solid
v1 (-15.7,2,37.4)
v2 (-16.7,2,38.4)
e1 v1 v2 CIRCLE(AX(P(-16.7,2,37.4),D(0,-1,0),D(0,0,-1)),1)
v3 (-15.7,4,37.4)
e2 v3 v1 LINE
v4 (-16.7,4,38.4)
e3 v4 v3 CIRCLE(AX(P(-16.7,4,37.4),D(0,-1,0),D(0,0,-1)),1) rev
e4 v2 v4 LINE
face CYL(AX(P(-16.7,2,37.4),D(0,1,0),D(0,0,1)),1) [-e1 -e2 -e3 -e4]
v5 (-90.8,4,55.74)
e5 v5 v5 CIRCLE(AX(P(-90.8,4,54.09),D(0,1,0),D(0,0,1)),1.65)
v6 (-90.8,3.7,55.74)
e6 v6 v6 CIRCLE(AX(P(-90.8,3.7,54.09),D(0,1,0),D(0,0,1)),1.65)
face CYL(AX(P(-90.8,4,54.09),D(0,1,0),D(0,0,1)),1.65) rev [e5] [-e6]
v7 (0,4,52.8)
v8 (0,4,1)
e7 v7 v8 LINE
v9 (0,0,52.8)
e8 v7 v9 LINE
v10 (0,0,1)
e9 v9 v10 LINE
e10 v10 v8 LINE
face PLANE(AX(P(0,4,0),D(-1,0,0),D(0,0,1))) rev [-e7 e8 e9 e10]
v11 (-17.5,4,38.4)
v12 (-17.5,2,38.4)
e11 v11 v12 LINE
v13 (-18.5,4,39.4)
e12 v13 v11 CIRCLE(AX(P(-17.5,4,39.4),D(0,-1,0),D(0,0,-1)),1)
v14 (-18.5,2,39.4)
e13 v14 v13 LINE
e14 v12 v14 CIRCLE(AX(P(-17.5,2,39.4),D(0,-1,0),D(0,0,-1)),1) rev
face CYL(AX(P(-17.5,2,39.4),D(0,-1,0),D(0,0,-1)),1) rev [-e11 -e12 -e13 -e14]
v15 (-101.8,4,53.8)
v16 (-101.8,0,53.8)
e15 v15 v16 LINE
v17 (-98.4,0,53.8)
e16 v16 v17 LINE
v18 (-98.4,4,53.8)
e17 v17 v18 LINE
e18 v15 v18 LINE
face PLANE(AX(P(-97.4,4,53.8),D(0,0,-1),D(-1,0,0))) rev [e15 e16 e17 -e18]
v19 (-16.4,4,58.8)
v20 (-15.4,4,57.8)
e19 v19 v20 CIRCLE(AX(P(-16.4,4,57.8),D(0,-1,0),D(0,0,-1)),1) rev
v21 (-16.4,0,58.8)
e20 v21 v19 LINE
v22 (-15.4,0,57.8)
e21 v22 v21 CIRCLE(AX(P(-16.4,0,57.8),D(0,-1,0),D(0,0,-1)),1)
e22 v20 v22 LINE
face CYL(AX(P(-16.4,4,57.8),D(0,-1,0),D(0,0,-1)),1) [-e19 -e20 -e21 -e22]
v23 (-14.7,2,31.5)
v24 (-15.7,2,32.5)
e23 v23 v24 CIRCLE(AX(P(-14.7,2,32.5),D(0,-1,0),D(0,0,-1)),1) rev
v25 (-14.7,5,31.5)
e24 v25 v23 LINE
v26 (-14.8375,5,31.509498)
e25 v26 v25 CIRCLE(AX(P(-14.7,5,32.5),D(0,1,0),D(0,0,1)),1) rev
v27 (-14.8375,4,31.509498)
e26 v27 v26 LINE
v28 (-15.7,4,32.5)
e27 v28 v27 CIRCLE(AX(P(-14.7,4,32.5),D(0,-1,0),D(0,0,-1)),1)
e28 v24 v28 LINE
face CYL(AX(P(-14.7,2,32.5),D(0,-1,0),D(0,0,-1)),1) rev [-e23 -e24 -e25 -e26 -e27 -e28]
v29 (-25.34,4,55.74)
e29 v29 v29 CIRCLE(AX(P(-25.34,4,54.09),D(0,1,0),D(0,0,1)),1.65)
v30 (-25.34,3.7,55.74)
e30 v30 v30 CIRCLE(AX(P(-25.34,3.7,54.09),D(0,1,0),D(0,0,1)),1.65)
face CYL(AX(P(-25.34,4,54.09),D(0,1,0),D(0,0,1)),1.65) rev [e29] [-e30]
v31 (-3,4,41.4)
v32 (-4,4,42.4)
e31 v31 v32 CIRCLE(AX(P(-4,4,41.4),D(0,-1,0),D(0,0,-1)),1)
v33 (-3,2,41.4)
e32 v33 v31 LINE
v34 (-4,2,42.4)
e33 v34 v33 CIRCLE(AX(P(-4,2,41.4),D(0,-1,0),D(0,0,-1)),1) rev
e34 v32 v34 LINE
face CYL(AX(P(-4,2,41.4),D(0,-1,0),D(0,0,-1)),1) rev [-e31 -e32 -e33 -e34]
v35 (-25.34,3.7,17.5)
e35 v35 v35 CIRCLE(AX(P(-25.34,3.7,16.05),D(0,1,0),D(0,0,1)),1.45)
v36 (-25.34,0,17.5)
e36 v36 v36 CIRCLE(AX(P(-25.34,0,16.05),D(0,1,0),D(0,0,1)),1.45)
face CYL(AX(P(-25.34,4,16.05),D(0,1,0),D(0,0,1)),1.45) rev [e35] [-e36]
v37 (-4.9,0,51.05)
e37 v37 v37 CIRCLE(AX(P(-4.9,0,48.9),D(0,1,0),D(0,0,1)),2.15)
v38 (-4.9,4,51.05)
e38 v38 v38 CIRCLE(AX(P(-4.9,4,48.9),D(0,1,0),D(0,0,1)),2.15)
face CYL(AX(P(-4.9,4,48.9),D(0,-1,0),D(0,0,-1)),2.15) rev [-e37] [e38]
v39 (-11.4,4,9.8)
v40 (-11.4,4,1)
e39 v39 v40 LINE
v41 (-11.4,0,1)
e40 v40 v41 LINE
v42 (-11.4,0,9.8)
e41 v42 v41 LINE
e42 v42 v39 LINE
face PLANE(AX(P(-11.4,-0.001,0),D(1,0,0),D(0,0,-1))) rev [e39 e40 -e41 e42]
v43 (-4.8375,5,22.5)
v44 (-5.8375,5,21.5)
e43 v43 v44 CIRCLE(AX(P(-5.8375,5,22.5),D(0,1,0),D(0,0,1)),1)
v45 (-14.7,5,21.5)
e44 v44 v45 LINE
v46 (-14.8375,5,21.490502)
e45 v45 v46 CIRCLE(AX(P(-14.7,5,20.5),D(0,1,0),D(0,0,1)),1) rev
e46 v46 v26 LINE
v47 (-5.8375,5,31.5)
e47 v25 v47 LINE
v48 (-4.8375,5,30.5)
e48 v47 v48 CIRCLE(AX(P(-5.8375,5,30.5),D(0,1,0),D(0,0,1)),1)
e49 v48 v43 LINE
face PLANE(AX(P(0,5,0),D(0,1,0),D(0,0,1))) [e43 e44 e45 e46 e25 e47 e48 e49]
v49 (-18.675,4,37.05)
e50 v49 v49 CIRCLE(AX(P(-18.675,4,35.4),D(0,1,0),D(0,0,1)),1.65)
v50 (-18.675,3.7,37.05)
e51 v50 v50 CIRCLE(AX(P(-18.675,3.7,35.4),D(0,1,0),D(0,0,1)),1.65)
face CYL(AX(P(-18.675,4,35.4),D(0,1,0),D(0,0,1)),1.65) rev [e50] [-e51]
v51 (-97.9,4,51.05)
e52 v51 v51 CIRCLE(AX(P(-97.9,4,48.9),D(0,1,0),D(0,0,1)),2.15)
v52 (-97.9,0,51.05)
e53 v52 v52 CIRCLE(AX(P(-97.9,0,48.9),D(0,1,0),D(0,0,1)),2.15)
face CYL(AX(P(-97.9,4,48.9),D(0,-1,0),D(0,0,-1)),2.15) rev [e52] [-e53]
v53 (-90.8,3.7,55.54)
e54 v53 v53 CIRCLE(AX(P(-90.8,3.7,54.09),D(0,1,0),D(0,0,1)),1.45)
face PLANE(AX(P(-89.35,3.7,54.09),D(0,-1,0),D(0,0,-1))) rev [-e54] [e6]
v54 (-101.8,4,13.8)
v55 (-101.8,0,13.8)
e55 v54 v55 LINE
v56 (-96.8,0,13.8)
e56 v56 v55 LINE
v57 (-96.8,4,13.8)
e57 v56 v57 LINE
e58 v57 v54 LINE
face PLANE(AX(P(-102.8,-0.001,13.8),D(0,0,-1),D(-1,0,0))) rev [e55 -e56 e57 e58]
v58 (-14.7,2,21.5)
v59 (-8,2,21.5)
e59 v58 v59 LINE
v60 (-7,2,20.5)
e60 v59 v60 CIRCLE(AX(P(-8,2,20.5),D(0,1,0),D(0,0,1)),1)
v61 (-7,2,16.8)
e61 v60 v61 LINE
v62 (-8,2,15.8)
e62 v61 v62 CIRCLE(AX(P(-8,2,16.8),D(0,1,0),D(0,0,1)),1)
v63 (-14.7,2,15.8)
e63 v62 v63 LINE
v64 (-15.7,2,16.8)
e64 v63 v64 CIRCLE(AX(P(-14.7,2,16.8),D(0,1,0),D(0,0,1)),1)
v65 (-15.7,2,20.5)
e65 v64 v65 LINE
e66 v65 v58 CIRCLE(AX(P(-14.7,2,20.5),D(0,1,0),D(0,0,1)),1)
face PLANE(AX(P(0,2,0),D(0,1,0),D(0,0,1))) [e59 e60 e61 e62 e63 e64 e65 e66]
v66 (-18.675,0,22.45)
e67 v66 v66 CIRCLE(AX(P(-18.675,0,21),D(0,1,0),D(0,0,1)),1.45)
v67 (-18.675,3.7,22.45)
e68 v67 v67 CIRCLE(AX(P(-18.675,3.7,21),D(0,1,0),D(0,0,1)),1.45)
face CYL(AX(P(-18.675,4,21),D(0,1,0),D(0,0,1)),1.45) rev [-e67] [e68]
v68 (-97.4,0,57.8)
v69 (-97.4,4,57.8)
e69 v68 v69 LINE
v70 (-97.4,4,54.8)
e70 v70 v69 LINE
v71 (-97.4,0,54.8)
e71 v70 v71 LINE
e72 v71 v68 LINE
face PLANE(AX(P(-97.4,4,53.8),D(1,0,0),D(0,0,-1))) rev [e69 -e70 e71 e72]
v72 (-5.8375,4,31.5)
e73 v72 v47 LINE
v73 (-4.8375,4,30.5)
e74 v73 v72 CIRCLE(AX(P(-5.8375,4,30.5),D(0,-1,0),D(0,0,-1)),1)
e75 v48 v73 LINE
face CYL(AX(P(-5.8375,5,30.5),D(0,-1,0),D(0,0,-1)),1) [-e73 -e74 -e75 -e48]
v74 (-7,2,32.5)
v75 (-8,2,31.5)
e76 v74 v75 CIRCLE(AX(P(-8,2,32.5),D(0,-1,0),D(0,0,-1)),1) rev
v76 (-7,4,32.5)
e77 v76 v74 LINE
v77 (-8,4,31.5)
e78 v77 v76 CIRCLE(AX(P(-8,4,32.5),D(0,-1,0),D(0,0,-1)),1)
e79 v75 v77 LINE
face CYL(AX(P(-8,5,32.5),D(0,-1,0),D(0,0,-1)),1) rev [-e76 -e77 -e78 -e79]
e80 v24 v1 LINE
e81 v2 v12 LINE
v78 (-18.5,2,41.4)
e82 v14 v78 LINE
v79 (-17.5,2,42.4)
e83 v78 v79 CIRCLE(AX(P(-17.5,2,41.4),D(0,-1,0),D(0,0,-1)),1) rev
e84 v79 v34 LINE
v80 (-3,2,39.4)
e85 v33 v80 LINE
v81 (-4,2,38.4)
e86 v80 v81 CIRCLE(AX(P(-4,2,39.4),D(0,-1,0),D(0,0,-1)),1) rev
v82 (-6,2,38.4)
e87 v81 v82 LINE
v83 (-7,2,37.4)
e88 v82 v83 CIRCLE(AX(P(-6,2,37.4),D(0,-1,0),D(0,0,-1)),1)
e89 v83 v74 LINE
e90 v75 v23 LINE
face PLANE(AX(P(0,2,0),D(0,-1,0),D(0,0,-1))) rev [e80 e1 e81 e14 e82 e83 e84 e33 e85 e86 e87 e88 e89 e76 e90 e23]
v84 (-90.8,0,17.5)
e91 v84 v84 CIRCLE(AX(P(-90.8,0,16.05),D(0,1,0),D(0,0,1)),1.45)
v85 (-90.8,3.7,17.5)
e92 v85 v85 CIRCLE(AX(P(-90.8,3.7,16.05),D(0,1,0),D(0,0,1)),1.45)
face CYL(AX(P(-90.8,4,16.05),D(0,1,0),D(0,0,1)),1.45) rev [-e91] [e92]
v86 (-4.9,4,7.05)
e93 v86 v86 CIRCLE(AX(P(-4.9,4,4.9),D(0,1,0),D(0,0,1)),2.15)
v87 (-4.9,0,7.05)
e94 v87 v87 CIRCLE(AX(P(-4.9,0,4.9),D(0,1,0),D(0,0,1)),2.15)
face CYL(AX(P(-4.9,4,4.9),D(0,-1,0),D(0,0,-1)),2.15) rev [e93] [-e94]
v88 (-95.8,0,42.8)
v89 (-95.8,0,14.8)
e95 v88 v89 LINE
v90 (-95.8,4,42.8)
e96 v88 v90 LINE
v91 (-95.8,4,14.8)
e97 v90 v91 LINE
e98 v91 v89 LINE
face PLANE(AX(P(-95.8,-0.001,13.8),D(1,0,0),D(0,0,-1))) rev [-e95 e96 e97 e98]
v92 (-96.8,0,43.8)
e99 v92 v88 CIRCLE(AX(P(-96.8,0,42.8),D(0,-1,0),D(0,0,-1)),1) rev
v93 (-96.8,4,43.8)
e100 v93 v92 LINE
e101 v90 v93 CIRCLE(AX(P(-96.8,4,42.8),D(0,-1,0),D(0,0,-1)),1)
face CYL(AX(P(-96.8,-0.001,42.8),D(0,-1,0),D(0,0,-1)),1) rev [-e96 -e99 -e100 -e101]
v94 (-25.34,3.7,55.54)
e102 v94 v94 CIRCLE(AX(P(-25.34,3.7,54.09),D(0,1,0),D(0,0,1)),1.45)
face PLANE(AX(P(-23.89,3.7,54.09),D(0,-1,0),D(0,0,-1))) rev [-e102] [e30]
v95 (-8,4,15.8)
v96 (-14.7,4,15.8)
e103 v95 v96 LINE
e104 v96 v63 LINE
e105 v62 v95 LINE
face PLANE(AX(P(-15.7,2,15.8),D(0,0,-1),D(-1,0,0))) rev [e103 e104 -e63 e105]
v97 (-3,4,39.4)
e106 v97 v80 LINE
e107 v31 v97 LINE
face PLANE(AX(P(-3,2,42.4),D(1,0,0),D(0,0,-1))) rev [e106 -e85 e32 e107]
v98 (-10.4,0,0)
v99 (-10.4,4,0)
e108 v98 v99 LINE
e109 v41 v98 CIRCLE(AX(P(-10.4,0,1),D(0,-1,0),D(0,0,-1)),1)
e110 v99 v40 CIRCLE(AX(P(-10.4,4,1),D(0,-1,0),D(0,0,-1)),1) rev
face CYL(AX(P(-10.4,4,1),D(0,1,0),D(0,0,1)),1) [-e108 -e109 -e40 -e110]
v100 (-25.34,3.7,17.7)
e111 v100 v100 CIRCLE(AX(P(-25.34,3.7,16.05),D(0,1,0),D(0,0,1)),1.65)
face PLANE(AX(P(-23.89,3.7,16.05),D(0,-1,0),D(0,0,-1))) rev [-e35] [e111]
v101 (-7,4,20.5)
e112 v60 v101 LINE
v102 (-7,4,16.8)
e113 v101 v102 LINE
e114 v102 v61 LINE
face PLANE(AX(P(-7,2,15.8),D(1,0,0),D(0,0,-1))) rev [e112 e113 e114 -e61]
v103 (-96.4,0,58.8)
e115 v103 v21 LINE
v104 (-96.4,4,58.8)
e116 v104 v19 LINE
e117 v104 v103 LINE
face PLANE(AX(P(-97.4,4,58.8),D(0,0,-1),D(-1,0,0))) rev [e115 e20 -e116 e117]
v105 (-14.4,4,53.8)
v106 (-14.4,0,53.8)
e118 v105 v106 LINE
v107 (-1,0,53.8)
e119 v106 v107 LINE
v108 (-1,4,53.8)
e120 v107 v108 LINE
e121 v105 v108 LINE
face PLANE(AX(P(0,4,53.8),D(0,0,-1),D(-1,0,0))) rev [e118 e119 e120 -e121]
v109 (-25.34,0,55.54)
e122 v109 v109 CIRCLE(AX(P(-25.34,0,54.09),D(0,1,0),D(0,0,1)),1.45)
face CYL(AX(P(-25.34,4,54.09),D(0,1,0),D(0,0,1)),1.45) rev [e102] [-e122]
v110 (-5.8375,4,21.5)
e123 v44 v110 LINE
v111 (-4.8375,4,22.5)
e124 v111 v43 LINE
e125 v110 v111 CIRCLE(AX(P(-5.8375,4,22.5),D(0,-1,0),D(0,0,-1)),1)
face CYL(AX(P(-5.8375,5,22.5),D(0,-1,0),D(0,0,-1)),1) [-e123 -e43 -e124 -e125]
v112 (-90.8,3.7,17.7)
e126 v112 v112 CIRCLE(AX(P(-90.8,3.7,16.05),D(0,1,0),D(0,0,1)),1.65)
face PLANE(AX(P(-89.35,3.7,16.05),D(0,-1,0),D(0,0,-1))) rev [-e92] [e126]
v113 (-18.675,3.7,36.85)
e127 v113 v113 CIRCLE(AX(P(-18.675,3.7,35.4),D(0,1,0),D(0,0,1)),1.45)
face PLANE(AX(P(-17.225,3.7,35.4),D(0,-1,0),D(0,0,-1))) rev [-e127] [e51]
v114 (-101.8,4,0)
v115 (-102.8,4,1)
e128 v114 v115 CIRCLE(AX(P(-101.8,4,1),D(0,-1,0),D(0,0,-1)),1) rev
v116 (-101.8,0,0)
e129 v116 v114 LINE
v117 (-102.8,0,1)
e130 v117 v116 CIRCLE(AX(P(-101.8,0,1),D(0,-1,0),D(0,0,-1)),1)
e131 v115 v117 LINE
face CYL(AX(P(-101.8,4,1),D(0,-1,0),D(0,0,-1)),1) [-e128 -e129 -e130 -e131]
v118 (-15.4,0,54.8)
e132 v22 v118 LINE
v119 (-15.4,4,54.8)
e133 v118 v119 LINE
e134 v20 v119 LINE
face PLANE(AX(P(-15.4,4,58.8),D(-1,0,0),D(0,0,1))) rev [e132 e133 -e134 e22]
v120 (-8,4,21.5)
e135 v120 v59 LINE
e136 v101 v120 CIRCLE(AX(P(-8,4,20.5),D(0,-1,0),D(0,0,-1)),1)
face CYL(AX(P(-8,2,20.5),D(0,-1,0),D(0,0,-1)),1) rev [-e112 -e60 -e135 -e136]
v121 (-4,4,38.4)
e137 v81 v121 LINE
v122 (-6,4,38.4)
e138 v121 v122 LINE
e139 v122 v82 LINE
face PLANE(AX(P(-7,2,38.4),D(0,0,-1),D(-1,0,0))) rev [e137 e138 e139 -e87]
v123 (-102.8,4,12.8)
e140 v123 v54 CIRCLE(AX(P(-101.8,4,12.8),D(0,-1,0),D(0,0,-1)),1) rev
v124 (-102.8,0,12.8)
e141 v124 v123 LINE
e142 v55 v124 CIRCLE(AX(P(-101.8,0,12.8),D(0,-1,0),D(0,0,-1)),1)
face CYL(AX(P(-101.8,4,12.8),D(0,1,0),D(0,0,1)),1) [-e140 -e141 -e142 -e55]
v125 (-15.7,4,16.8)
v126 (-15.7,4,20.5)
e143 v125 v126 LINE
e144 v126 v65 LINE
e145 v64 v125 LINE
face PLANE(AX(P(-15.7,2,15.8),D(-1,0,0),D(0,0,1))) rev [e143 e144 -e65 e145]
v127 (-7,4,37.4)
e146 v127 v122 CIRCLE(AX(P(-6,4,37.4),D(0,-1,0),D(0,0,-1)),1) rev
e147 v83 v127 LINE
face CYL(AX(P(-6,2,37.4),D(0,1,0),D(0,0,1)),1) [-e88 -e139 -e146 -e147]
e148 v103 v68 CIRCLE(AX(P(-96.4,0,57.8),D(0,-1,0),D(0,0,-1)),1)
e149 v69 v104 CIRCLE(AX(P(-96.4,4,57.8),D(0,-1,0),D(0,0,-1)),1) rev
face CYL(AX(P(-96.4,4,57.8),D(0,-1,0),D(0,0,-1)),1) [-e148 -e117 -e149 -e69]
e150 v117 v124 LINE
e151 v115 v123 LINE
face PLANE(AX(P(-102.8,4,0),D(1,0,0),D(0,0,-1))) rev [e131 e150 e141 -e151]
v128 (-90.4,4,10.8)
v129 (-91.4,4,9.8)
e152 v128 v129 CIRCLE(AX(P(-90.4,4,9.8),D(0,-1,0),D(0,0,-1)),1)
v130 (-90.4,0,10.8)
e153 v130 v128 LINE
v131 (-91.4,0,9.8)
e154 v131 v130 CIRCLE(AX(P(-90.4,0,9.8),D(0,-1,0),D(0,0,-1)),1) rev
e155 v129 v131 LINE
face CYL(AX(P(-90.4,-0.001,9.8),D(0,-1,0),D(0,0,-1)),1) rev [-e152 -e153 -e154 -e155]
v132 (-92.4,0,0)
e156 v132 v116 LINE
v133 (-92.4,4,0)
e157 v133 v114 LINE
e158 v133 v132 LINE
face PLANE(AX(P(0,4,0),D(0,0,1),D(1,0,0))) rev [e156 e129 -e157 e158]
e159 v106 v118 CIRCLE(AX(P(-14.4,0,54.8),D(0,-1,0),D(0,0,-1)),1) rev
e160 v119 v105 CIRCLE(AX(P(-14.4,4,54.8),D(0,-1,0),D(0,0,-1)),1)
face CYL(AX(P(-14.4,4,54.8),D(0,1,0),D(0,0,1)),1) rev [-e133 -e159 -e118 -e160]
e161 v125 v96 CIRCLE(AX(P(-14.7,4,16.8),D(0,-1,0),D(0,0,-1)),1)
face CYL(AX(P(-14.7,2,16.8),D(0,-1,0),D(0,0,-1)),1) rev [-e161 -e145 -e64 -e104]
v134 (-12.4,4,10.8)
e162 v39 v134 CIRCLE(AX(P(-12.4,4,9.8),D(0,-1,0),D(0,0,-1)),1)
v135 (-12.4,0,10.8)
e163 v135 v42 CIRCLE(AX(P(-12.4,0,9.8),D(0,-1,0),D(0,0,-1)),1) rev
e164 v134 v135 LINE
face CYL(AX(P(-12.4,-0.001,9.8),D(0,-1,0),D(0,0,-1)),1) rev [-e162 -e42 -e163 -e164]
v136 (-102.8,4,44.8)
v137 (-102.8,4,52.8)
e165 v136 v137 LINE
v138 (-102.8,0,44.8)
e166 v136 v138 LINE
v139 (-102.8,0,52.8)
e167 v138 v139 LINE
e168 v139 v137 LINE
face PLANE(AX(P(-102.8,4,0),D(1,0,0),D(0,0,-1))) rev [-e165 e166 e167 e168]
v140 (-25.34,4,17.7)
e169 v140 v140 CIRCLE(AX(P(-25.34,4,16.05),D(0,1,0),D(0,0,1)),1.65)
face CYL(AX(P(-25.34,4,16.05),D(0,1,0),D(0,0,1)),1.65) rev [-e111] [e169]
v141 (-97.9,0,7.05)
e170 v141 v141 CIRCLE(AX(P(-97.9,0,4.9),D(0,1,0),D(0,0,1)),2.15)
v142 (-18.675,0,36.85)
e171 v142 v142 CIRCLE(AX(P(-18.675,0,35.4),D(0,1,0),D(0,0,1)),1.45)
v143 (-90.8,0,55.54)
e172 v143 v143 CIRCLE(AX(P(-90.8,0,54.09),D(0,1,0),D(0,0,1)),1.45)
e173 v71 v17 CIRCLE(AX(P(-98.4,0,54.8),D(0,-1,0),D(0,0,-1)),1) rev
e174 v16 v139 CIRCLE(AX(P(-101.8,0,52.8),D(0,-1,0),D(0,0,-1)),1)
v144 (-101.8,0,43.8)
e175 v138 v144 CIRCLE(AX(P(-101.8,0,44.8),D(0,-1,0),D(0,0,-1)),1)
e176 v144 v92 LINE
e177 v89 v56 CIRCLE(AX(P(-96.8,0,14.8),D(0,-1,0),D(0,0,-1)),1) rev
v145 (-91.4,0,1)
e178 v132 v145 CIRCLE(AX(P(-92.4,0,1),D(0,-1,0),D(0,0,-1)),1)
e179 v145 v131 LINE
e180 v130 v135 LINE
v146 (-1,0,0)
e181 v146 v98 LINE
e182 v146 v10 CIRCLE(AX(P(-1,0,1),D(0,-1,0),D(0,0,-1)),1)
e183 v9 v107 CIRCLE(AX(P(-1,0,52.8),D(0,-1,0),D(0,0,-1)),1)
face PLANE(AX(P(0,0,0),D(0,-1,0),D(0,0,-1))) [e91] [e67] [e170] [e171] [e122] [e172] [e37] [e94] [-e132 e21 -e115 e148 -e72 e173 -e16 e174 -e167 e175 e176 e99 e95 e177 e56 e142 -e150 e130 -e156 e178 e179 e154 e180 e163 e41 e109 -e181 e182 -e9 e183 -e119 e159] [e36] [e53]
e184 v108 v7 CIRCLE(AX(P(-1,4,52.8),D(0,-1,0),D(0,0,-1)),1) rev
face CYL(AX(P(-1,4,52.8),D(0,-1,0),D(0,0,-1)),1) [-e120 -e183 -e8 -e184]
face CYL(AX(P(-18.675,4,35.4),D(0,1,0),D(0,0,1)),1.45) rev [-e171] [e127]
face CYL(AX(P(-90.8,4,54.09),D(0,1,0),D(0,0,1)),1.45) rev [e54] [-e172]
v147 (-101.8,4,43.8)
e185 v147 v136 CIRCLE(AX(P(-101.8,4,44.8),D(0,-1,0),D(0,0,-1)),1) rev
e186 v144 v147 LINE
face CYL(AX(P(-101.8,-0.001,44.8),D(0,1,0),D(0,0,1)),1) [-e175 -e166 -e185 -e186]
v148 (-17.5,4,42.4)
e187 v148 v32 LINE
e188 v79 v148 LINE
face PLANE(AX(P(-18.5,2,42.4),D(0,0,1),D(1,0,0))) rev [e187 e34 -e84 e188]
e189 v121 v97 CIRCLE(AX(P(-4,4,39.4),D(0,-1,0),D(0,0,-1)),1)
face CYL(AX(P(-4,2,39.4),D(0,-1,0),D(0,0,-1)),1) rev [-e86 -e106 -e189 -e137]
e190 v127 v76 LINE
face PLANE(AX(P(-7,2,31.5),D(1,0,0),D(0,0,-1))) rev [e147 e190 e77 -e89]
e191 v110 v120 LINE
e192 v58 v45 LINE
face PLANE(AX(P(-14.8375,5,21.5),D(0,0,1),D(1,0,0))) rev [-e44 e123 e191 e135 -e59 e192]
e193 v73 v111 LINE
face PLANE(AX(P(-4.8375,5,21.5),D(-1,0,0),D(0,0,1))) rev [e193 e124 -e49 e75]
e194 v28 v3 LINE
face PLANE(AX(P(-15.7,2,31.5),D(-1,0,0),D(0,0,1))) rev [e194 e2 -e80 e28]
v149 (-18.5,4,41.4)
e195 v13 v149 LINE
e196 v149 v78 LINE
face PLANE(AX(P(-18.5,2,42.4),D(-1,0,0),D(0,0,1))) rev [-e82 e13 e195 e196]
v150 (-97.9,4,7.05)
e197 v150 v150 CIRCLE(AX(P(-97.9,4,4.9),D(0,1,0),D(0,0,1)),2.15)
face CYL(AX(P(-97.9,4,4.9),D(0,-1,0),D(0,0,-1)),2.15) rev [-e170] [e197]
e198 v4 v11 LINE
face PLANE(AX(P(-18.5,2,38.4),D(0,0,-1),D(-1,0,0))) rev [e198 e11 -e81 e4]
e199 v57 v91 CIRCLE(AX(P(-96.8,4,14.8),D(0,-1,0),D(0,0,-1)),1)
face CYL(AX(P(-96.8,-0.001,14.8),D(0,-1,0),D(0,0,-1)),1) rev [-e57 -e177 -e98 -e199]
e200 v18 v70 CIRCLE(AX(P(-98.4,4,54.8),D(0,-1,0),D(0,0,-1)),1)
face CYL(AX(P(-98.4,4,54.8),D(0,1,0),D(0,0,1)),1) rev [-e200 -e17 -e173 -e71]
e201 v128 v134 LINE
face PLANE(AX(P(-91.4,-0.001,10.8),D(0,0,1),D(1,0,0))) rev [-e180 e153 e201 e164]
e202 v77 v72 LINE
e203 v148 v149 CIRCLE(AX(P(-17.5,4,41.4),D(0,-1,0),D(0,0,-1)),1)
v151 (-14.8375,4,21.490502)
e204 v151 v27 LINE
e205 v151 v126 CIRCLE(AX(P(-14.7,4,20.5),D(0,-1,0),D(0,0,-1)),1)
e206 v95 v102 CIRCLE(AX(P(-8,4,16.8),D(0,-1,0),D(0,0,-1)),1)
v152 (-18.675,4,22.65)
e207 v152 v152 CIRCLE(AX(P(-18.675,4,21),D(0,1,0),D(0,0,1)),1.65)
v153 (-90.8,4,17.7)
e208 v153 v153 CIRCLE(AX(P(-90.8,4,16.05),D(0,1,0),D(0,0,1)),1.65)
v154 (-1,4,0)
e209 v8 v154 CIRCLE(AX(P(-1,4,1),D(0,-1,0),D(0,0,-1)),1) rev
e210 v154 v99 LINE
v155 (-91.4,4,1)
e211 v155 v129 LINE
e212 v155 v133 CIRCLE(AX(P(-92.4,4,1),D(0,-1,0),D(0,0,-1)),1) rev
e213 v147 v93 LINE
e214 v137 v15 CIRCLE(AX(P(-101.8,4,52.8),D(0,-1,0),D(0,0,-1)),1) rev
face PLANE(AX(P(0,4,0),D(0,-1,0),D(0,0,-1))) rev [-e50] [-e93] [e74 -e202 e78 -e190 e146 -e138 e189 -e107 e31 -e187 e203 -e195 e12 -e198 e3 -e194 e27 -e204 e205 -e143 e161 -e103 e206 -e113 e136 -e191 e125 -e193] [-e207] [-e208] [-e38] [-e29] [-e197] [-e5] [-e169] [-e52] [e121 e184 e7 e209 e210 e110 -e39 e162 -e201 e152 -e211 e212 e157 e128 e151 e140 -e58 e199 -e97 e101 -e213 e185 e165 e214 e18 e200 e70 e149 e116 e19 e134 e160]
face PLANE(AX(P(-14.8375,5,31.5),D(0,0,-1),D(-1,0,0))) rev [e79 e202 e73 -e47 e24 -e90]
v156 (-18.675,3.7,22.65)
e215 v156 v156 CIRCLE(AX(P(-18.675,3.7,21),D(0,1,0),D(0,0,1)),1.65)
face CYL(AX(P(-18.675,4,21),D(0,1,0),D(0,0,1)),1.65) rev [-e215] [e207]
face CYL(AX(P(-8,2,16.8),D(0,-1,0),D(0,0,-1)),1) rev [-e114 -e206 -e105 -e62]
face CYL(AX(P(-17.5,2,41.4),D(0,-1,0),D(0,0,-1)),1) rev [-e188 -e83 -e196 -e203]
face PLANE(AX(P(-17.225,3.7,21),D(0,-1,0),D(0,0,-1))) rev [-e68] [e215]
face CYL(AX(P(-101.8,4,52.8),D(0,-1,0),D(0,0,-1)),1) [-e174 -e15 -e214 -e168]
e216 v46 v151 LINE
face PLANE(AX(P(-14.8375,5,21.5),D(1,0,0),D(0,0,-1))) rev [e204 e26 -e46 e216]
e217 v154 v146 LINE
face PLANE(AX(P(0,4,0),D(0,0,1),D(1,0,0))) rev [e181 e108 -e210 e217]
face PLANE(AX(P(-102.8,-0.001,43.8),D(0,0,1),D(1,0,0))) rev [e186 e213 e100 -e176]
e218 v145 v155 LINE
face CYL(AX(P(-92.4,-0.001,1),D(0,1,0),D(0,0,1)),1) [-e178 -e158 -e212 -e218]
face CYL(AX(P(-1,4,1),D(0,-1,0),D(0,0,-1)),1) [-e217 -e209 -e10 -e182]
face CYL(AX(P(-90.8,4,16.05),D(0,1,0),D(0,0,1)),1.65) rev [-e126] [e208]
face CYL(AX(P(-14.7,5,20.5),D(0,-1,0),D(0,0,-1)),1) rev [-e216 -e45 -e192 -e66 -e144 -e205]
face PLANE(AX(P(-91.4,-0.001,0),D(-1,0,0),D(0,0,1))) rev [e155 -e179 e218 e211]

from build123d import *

# Parameters (mm, degrees)
SKETCH1_R                        = 2.15
MAIN_DEPTH                       = 4
WIRE_ESCAPES_REACH               = 120.496
SKETCH4_W                        = 7
SKETCH4_H                        = 30
BUTTON_CLEARANCE_REACH           = 120.496
SKETCH5_W                        = 80
SKETCH5_H                        = 10.8
M2_HEAT_SETS_D                   = 2.9
M2_HEAT_SETS_CBORE_D             = 3.3
M2_HEAT_SETS_CBORE_DEPTH         = 0.3
SKETCH7_W                        = 10
SKETCH7_H                        = 10
ENCODER_STANDOFF_DEPTH           = 1
SKETCH9_W                        = 8.7
SKETCH9_H                        = 5.7
ENCODER_TERMINAL_CLEARANCE_DEPTH = 2
FILLET1_R                        = 1


with BuildPart() as part:
    # Sketch1 → Main (new body)
    with BuildSketch(Plane(origin=(0, 0, 0), x_dir=(1, 0, 0), z_dir=(0, 1, 0))):
        Polygon((0, 0), (-102.8, 0), (-102.8, -53.8), (-97.4, -53.8), (-97.4, -58.8), (-15.4, -58.8), (-15.4, -53.8), (0, -53.8), align=None)
        with Locations(Location((-97.9, -4.9, 0), (0, 0, 270))):
            Circle(SKETCH1_R, mode=Mode.SUBTRACT)
        with Locations(Location((-97.9, -48.9, 0), (0, 0, 270))):
            Circle(SKETCH1_R, mode=Mode.SUBTRACT)
        with Locations(Location((-4.9, -4.9, 0), (0, 0, 270))):
            Circle(SKETCH1_R, mode=Mode.SUBTRACT)
        with Locations(Location((-4.9, -48.9, 0), (0, 0, 270))):
            Circle(SKETCH1_R, mode=Mode.SUBTRACT)
    extrude(amount=MAIN_DEPTH)

    # Sketch4 → Wire Escapes (cut, up to next)
    with BuildSketch(Plane(origin=(0, 4, 0), x_dir=(1, 0, 0), z_dir=(0, 1, 0)), mode=Mode.PRIVATE) as wire_escapes_sk1:
        with Locations((-99.3, -28.8)):
            Rectangle(SKETCH4_W, SKETCH4_H)
    wire_escapes_tool1 = extrude(wire_escapes_sk1.sketch, amount=-WIRE_ESCAPES_REACH, mode=Mode.PRIVATE) & part.part
    add(wire_escapes_tool1.solids().sort_by_distance((-99.3, 4, 28.8))[0], mode=Mode.SUBTRACT)

    # Sketch5 → Button Clearance (cut, up to next)
    with BuildSketch(Plane(origin=(0, 4, 0), x_dir=(1, 0, 0), z_dir=(0, 1, 0)), mode=Mode.PRIVATE) as button_clearance_sk1:
        with Locations((-51.4, -5.4)):
            Rectangle(SKETCH5_W, SKETCH5_H)
    button_clearance_tool1 = extrude(button_clearance_sk1.sketch, amount=-BUTTON_CLEARANCE_REACH, mode=Mode.PRIVATE) & part.part
    add(button_clearance_tool1.solids().sort_by_distance((-51.4, 4, 5.4))[0], mode=Mode.SUBTRACT)

    # M2 Heat Sets (through all)
    with Locations(Plane(origin=(-90.8, 4, 16.05), x_dir=(0, 0, 1), z_dir=(0, 1, 0))):
        with Locations((0, 0), (38.04, 0), (38.04, 65.46), (0, 65.46), (4.95, 72.125), (19.35, 72.125)):
            CounterBoreHole(M2_HEAT_SETS_D / 2, M2_HEAT_SETS_CBORE_D / 2, M2_HEAT_SETS_CBORE_DEPTH)

    # Sketch7 → Encoder Standoff (add)
    with BuildSketch(Plane(origin=(0, 4, 0), x_dir=(1, 0, 0), z_dir=(0, 1, 0))):
        with Locations((-9.8375, -26.5)):
            Rectangle(SKETCH7_W, SKETCH7_H)
    extrude(amount=ENCODER_STANDOFF_DEPTH)

    # Sketch9 → Encoder Terminal Clearance (cut)
    with BuildSketch(Plane(origin=(0, 4, 0), x_dir=(1, 0, 0), z_dir=(0, 1, 0))):
        with Locations((-11.35, -18.65)):
            Rectangle(SKETCH9_W, SKETCH9_H)
        Polygon((-15.7, -31.5), (-7, -31.5), (-7, -38.4), (-3, -38.4), (-3, -42.4), (-18.5, -42.4), (-18.5, -38.4), (-15.7, -38.4), align=None)
    extrude(amount=-ENCODER_TERMINAL_CLEARANCE_DEPTH, mode=Mode.SUBTRACT)

    # Fillet1
    # the kernel refuses this fillet: 1 mm, written as the material it adds along each edge
    with BuildSketch(Plane(origin=(-15.4, 0, 53.8), x_dir=(1, 0, 0), z_dir=(0, 1, 0)), Plane(origin=(-97.4, 0, 53.8), x_dir=(0, 0, 1), z_dir=(0, 1, 0)), Plane(origin=(-11.4, 4, 10.8), x_dir=(0, 0, -1), z_dir=(0, -1, 0)), Plane(origin=(-91.4, 4, 10.8), x_dir=(1, 0, 0), z_dir=(0, -1, 0))) as fillet1_piece_1:
        with BuildLine():
            CenterArc((FILLET1_R, -FILLET1_R), FILLET1_R, 90, 90)
            Line((0, -FILLET1_R), (0, 0))
            Line((0, 0), (FILLET1_R, 0))
        make_face()
    extrude(amount=4)
    with BuildSketch(Plane(origin=(-95.8, 4, 43.8), x_dir=(-1, 0, 0), z_dir=(0, -1, 0)), Plane(origin=(-95.8, 4, 13.8), x_dir=(0, 0, 1), z_dir=(0, -1, 0))) as fillet1_piece_2:
        with BuildLine():
            CenterArc((FILLET1_R, FILLET1_R), FILLET1_R, 180, 90)
            Line((0, FILLET1_R), (0, 0))
            Line((0, 0), (FILLET1_R, 0))
        make_face()
    extrude(amount=4)
    with BuildSketch(Plane(origin=(-18.5, 4, 42.4), x_dir=(0, 0, -1), z_dir=(0, -1, 0)), Plane(origin=(-3, 4, 42.4), x_dir=(-1, 0, 0), z_dir=(0, -1, 0)), Plane(origin=(-3, 4, 38.4), x_dir=(0, 0, 1), z_dir=(0, -1, 0)), Plane(origin=(-18.5, 4, 38.4), x_dir=(1, 0, 0), z_dir=(0, -1, 0)), Plane(origin=(-7, 4, 15.8), x_dir=(0, 0, 1), z_dir=(0, -1, 0)), Plane(origin=(-15.7, 4, 15.8), x_dir=(1, 0, 0), z_dir=(0, -1, 0)), Plane(origin=(-15.7, 4, 31.5), x_dir=(1, 0, 0), z_dir=(0, -1, 0)), Plane(origin=(-7, 4, 21.5), x_dir=(-1, 0, 0), z_dir=(0, -1, 0))) as fillet1_piece_3:
        with BuildLine():
            CenterArc((FILLET1_R, FILLET1_R), FILLET1_R, 180, 90)
            Line((0, FILLET1_R), (0, 0))
            Line((0, 0), (FILLET1_R, 0))
        make_face()
    extrude(amount=2)
    with BuildSketch(Plane(origin=(-15.7, 6.5, 21.5), x_dir=(1, 0, 0), z_dir=(0, -1, 0))) as fillet1_piece_4_section:
        with BuildLine():
            CenterArc((FILLET1_R, -FILLET1_R), FILLET1_R, 90, 90)
            Line((0, -FILLET1_R), (0, 0))
            Line((0, 0), (FILLET1_R, 0))
        make_face()
    fillet1_piece_4 = extrude(amount=4.5, mode=Mode.PRIVATE)
    fillet1_piece_4 = split(fillet1_piece_4, bisect_by=Plane(origin=(-14.8375, 4.5, 21.497152865), z_dir=(1, 0, 0)), keep=Keep.TOP, mode=Mode.PRIVATE)
    fillet1_piece_4 = split(fillet1_piece_4, bisect_by=Plane(origin=(-14.803157734, 5, 21.497152865), z_dir=(0, -1, 0)), keep=Keep.TOP, mode=Mode.PRIVATE)
    add(fillet1_piece_4)
    with BuildSketch(Plane(origin=(-15.7, 4, 21.5), x_dir=(1, 0, 0), z_dir=(0, -1, 0)), Plane(origin=(-7, 4, 31.5), x_dir=(-1, 0, 0), z_dir=(0, -1, 0))) as fillet1_piece_5:
        with BuildLine():
            CenterArc((FILLET1_R, -FILLET1_R), FILLET1_R, 90, 90)
            Line((0, -FILLET1_R), (0, 0))
            Line((0, 0), (FILLET1_R, 0))
        make_face()
    extrude(amount=2)
    with BuildSketch(Plane(origin=(-15.7, 6.5, 31.5), x_dir=(1, 0, 0), z_dir=(0, -1, 0))) as fillet1_piece_6_section:
        with BuildLine():
            CenterArc((FILLET1_R, FILLET1_R), FILLET1_R, 180, 90)
            Line((0, FILLET1_R), (0, 0))
            Line((0, 0), (FILLET1_R, 0))
        make_face()
    fillet1_piece_6 = extrude(amount=4.5, mode=Mode.PRIVATE)
    fillet1_piece_6 = split(fillet1_piece_6, bisect_by=Plane(origin=(-14.8375, 4.5, 31.502847135), z_dir=(1, 0, 0)), keep=Keep.TOP, mode=Mode.PRIVATE)
    fillet1_piece_6 = split(fillet1_piece_6, bisect_by=Plane(origin=(-14.803157734, 5, 31.502847135), z_dir=(0, -1, 0)), keep=Keep.TOP, mode=Mode.PRIVATE)
    add(fillet1_piece_6)
    # the kernel refuses this fillet: 1 mm, written as the material it takes off along each edge
    with BuildSketch(Plane(origin=(0, -2.5, 0), x_dir=(-1, 0, 0), z_dir=(0, 1, 0)), Plane(origin=(0, -2.5, 53.8), x_dir=(0, 0, -1), z_dir=(0, 1, 0)), Plane(origin=(-102.8, -2.5, 0), x_dir=(0, 0, 1), z_dir=(0, 1, 0)), Plane(origin=(-15.4, -2.5, 58.8), x_dir=(0, 0, -1), z_dir=(0, 1, 0)), Plane(origin=(-102.8, -2.5, 53.8), x_dir=(1, 0, 0), z_dir=(0, 1, 0)), Plane(origin=(-97.4, -2.5, 58.8), x_dir=(1, 0, 0), z_dir=(0, 1, 0)), Plane(origin=(-11.4, 6.5, 0), x_dir=(1, 0, 0), z_dir=(0, -1, 0))) as fillet1_2_piece_1:
        with BuildLine():
            CenterArc((FILLET1_R, FILLET1_R), FILLET1_R, 180, 90)
            Line((0, FILLET1_R), (0, 0))
            Line((0, 0), (FILLET1_R, 0))
        make_face()
    extrude(amount=9, mode=Mode.SUBTRACT)
    with BuildSketch(Plane(origin=(-102.8, 6.5, 43.8), x_dir=(0, 0, 1), z_dir=(0, -1, 0)), Plane(origin=(-102.8, 6.5, 13.8), x_dir=(1, 0, 0), z_dir=(0, -1, 0)), Plane(origin=(-91.4, 6.5, 0), x_dir=(-1, 0, 0), z_dir=(0, -1, 0))) as fillet1_2_piece_2:
        with BuildLine():
            CenterArc((FILLET1_R, -FILLET1_R), FILLET1_R, 90, 90)
            Line((0, -FILLET1_R), (0, 0))
            Line((0, 0), (FILLET1_R, 0))
        make_face()
    extrude(amount=9, mode=Mode.SUBTRACT)
    with BuildSketch(Plane(origin=(-4.8375, 4, 21.5), x_dir=(0, 0, 1), z_dir=(0, 1, 0)), Plane(origin=(-4.8375, 4, 31.5), x_dir=(-1, 0, 0), z_dir=(0, 1, 0))) as fillet1_2_piece_3:
        with BuildLine():
            CenterArc((FILLET1_R, -FILLET1_R), FILLET1_R, 90, 90)
            Line((0, -FILLET1_R), (0, 0))
            Line((0, 0), (FILLET1_R, 0))
        make_face()
    extrude(amount=3.5, mode=Mode.SUBTRACT)
    with BuildSketch(Plane(origin=(-15.7, 6.5, 38.4), x_dir=(-1, 0, 0), z_dir=(0, -1, 0))) as fillet1_2_piece_4:
        with BuildLine():
            CenterArc((FILLET1_R, FILLET1_R), FILLET1_R, 180, 90)
            Line((0, FILLET1_R), (0, 0))
            Line((0, 0), (FILLET1_R, 0))
        make_face()
    extrude(amount=4.5, mode=Mode.SUBTRACT)
    with BuildSketch(Plane(origin=(-7, 6.5, 38.4), x_dir=(1, 0, 0), z_dir=(0, -1, 0))) as fillet1_2_piece_5:
        with BuildLine():
            CenterArc((FILLET1_R, -FILLET1_R), FILLET1_R, 90, 90)
            Line((0, -FILLET1_R), (0, 0))
            Line((0, 0), (FILLET1_R, 0))
        make_face()
    extrude(amount=4.5, mode=Mode.SUBTRACT)


solid = part.part
